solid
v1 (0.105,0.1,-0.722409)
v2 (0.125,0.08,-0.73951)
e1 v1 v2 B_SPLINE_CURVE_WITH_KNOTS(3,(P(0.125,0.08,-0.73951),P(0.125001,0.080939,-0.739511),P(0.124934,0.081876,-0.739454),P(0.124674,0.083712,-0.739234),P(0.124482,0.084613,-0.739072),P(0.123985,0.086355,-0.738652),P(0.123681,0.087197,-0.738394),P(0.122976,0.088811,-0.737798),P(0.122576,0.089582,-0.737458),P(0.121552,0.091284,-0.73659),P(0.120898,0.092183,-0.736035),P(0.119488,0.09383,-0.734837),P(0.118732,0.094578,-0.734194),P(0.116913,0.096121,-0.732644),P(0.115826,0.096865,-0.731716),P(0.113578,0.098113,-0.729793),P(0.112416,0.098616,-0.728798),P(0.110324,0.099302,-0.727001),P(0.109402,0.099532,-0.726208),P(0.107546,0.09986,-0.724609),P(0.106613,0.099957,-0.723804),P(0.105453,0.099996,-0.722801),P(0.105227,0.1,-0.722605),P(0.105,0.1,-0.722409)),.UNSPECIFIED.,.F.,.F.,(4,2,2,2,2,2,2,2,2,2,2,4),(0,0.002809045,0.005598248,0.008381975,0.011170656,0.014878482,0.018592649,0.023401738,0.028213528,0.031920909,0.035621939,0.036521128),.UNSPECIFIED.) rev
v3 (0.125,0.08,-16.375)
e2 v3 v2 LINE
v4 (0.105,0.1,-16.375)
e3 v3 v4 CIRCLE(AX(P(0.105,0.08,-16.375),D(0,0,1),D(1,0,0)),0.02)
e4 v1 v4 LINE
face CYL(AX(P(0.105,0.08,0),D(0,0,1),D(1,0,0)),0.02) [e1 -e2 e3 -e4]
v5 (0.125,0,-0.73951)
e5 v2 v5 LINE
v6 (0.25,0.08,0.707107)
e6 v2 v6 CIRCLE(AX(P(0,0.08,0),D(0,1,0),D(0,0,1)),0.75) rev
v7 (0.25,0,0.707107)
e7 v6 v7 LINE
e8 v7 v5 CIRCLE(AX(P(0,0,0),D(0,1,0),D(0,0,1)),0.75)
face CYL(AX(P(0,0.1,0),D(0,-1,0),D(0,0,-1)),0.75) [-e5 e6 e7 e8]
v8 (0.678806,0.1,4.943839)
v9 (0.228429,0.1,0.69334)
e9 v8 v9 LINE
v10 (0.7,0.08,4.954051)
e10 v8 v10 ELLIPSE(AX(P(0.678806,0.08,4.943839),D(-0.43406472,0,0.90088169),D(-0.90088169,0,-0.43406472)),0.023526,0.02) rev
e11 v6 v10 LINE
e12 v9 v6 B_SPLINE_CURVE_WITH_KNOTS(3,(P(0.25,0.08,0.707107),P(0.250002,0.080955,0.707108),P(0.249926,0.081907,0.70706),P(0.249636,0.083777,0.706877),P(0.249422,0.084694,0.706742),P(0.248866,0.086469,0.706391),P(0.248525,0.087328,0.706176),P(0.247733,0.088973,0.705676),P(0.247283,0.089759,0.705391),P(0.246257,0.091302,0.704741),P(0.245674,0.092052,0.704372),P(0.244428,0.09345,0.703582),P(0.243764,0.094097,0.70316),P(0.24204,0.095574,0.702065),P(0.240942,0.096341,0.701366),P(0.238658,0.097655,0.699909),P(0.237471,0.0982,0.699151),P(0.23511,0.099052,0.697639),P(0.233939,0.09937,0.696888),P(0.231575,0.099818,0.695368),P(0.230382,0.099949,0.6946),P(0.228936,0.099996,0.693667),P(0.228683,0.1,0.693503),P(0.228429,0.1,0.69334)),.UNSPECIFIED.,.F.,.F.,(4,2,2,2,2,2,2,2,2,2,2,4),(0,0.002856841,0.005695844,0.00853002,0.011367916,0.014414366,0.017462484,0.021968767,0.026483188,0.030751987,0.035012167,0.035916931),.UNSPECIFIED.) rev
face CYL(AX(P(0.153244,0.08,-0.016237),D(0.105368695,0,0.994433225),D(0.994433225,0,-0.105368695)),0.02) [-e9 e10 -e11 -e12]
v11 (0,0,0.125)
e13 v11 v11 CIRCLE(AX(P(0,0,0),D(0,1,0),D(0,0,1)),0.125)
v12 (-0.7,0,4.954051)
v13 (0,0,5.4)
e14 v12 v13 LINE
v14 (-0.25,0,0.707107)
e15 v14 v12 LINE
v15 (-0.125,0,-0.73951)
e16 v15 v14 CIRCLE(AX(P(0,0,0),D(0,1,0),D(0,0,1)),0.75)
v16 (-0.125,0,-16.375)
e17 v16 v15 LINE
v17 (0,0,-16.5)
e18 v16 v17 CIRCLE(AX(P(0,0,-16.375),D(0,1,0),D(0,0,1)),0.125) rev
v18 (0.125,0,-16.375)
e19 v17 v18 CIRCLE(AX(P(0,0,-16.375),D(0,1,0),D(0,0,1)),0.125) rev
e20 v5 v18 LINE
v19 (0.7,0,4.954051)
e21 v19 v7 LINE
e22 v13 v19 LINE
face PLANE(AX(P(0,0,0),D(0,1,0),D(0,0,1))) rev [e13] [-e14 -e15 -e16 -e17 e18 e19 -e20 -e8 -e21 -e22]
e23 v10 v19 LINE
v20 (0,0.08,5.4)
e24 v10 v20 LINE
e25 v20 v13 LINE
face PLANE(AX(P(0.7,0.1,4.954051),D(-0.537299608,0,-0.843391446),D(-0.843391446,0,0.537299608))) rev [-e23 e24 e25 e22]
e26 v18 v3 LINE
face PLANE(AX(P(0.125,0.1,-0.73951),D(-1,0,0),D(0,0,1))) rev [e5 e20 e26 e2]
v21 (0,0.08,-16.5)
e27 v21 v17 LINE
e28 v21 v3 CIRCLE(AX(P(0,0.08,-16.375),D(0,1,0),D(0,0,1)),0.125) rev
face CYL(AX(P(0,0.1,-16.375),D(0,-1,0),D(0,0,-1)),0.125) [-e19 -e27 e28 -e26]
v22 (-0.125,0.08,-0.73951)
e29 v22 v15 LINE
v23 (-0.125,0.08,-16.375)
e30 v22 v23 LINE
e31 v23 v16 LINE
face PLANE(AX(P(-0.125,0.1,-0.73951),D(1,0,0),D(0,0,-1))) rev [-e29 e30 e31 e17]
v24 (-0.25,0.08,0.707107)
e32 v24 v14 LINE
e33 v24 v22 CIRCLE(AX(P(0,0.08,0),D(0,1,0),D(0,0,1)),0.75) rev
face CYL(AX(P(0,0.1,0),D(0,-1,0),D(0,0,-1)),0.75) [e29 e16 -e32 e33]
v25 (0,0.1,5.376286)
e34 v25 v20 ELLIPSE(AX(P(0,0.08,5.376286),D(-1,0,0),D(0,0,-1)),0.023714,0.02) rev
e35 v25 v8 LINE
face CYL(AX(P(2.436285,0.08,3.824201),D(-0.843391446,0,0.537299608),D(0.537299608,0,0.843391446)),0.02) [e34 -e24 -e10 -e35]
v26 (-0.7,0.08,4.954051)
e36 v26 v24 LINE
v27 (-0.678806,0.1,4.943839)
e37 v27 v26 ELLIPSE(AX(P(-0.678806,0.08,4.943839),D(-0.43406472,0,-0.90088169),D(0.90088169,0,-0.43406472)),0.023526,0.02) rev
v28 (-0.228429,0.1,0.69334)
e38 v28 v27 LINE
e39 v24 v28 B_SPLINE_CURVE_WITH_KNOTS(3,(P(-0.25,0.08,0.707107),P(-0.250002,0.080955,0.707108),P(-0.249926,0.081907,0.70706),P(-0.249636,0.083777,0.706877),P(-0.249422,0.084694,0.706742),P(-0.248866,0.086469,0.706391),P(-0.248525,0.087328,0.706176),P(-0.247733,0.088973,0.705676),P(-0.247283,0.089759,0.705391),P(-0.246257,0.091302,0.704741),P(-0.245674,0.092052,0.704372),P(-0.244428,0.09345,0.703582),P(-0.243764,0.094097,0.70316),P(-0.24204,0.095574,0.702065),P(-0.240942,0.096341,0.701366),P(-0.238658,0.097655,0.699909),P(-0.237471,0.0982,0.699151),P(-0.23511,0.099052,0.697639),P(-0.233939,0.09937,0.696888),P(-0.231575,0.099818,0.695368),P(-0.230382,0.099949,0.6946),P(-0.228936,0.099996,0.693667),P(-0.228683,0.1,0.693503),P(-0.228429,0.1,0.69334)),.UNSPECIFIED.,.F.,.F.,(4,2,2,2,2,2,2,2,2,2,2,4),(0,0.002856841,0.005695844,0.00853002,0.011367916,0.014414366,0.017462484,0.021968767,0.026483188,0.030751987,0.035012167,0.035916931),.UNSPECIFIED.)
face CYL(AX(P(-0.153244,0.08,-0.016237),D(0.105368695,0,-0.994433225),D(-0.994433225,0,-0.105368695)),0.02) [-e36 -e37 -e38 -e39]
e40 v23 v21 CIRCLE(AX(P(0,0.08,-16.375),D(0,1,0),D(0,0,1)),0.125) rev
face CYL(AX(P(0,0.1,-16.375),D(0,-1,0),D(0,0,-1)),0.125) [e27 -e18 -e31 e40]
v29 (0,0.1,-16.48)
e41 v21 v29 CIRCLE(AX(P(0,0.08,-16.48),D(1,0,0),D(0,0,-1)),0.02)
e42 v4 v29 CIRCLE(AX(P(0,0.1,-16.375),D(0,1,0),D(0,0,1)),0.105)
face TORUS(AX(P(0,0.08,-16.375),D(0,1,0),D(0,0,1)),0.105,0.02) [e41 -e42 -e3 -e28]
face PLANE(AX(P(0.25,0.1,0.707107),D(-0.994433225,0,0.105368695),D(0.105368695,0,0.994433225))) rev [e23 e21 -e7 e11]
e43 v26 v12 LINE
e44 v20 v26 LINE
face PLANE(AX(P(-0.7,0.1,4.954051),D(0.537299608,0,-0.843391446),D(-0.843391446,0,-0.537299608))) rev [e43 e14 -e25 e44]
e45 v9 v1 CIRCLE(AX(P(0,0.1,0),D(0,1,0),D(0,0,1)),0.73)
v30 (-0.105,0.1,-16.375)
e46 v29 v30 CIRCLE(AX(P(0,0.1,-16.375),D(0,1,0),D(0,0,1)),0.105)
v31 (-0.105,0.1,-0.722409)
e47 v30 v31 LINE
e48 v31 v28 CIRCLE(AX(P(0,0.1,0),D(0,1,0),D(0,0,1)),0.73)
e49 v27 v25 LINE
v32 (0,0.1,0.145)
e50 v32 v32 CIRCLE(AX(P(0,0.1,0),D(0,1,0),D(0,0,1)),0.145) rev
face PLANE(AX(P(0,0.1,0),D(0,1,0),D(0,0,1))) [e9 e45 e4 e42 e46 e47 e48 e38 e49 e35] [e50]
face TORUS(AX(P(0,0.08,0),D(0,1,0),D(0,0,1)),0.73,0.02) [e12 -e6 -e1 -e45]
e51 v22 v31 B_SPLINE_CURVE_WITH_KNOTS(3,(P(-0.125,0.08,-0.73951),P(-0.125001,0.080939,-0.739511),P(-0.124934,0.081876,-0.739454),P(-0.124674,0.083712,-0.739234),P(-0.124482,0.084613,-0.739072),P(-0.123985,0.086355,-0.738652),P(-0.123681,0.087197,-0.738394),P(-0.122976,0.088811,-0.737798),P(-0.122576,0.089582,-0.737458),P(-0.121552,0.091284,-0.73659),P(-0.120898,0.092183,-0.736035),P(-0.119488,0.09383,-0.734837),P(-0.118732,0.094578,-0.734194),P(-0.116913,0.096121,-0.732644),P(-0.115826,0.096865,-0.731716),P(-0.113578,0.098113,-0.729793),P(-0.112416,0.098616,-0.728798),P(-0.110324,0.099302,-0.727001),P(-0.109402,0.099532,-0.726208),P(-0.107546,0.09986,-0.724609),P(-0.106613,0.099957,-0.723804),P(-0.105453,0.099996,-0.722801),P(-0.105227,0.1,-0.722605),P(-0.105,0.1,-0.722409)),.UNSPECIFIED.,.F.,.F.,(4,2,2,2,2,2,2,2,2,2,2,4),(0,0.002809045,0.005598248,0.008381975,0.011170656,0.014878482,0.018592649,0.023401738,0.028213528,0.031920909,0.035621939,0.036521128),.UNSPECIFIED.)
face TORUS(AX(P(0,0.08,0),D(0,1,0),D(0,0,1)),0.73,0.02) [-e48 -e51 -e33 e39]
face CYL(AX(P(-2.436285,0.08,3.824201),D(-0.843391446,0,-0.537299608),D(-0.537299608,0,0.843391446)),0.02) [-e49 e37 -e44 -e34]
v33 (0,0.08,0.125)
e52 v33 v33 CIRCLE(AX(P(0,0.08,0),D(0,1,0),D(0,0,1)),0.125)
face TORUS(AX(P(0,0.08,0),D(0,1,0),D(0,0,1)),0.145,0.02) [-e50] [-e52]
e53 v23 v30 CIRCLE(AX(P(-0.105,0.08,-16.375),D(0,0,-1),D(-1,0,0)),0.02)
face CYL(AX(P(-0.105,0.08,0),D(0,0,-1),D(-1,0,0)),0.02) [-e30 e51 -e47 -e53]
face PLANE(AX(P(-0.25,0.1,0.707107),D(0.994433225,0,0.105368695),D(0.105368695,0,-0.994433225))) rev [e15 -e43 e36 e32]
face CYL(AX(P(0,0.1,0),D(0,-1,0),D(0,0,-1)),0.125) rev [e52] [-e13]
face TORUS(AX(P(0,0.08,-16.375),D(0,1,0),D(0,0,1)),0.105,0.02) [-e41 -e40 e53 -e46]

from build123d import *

# Parameters (mm, degrees)
SKETCH_3_R      = 0.125
EXTRUDE_1_DEPTH = 0.1
FILLET_1_R      = 0.125
FILLET_2_R      = 0.02


with BuildPart() as part:
    # 草图3 → 凸台-拉伸1 (new body)
    with BuildSketch(Plane(origin=(0, 0, 0), x_dir=(1, 0, 0), z_dir=(0, 1, 0))):
        with BuildLine():
            Line((0.125, 0.739509973), (0.125, 16.5))
            Line((0.125, 16.5), (-0.125, 16.5))
            Line((-0.125, 16.5), (-0.125, 0.739509973))
            ThreePointArc((-0.125, 0.739509973), (-0.747215671, 0.064565794), (-0.25, -0.707106781))
            Line((-0.25, -0.707106781), (-0.7, -4.954050817))
            Line((-0.7, -4.954050817), (0, -5.4))
            Line((0, -5.4), (0.7, -4.954050817))
            Line((0.7, -4.954050817), (0.25, -0.707106781))
            ThreePointArc((0.25, -0.707106781), (0.747215671, 0.064565794), (0.125, 0.739509973))
        make_face()
        with Locations(Location((0, 0, 0), (0, 0, 270))):
            Circle(SKETCH_3_R, mode=Mode.SUBTRACT)
    extrude(amount=EXTRUDE_1_DEPTH)

    # 圆角1
    fillet_1_edges = [part.edges().sort_by_distance(p)[0] for p in [
        (-0.125, 0.05, -16.5),
        (0.125, 0.05, -16.5),
    ]]
    fillet(fillet_1_edges, radius=FILLET_1_R - 0.0001)  # a hair under: the kernel refuses the full size

    # 圆角2
    fillet_2_edges = [part.edges().sort_by_distance(p)[0] for p in [
        (0.747215671, 0.1, -0.064565794),
        (0.125, 0.1, -8.557304986),
        (-0.747215671, 0.1, -0.064565794),
        (0, 0.1, -0.125),
        (-0.475, 0.1, 2.830578799),
        (-0.35, 0.1, 5.177025409),
        (-0.125, 0.1, -8.557304986),
        (0.088417637, 0.1, -16.463417637),
        (-0.088417637, 0.1, -16.463417637),
        (0.35, 0.1, 5.177025409),
        (0.475, 0.1, 2.830578799),
    ]]
    fillet(fillet_2_edges, radius=FILLET_2_R)


solid = part.part
